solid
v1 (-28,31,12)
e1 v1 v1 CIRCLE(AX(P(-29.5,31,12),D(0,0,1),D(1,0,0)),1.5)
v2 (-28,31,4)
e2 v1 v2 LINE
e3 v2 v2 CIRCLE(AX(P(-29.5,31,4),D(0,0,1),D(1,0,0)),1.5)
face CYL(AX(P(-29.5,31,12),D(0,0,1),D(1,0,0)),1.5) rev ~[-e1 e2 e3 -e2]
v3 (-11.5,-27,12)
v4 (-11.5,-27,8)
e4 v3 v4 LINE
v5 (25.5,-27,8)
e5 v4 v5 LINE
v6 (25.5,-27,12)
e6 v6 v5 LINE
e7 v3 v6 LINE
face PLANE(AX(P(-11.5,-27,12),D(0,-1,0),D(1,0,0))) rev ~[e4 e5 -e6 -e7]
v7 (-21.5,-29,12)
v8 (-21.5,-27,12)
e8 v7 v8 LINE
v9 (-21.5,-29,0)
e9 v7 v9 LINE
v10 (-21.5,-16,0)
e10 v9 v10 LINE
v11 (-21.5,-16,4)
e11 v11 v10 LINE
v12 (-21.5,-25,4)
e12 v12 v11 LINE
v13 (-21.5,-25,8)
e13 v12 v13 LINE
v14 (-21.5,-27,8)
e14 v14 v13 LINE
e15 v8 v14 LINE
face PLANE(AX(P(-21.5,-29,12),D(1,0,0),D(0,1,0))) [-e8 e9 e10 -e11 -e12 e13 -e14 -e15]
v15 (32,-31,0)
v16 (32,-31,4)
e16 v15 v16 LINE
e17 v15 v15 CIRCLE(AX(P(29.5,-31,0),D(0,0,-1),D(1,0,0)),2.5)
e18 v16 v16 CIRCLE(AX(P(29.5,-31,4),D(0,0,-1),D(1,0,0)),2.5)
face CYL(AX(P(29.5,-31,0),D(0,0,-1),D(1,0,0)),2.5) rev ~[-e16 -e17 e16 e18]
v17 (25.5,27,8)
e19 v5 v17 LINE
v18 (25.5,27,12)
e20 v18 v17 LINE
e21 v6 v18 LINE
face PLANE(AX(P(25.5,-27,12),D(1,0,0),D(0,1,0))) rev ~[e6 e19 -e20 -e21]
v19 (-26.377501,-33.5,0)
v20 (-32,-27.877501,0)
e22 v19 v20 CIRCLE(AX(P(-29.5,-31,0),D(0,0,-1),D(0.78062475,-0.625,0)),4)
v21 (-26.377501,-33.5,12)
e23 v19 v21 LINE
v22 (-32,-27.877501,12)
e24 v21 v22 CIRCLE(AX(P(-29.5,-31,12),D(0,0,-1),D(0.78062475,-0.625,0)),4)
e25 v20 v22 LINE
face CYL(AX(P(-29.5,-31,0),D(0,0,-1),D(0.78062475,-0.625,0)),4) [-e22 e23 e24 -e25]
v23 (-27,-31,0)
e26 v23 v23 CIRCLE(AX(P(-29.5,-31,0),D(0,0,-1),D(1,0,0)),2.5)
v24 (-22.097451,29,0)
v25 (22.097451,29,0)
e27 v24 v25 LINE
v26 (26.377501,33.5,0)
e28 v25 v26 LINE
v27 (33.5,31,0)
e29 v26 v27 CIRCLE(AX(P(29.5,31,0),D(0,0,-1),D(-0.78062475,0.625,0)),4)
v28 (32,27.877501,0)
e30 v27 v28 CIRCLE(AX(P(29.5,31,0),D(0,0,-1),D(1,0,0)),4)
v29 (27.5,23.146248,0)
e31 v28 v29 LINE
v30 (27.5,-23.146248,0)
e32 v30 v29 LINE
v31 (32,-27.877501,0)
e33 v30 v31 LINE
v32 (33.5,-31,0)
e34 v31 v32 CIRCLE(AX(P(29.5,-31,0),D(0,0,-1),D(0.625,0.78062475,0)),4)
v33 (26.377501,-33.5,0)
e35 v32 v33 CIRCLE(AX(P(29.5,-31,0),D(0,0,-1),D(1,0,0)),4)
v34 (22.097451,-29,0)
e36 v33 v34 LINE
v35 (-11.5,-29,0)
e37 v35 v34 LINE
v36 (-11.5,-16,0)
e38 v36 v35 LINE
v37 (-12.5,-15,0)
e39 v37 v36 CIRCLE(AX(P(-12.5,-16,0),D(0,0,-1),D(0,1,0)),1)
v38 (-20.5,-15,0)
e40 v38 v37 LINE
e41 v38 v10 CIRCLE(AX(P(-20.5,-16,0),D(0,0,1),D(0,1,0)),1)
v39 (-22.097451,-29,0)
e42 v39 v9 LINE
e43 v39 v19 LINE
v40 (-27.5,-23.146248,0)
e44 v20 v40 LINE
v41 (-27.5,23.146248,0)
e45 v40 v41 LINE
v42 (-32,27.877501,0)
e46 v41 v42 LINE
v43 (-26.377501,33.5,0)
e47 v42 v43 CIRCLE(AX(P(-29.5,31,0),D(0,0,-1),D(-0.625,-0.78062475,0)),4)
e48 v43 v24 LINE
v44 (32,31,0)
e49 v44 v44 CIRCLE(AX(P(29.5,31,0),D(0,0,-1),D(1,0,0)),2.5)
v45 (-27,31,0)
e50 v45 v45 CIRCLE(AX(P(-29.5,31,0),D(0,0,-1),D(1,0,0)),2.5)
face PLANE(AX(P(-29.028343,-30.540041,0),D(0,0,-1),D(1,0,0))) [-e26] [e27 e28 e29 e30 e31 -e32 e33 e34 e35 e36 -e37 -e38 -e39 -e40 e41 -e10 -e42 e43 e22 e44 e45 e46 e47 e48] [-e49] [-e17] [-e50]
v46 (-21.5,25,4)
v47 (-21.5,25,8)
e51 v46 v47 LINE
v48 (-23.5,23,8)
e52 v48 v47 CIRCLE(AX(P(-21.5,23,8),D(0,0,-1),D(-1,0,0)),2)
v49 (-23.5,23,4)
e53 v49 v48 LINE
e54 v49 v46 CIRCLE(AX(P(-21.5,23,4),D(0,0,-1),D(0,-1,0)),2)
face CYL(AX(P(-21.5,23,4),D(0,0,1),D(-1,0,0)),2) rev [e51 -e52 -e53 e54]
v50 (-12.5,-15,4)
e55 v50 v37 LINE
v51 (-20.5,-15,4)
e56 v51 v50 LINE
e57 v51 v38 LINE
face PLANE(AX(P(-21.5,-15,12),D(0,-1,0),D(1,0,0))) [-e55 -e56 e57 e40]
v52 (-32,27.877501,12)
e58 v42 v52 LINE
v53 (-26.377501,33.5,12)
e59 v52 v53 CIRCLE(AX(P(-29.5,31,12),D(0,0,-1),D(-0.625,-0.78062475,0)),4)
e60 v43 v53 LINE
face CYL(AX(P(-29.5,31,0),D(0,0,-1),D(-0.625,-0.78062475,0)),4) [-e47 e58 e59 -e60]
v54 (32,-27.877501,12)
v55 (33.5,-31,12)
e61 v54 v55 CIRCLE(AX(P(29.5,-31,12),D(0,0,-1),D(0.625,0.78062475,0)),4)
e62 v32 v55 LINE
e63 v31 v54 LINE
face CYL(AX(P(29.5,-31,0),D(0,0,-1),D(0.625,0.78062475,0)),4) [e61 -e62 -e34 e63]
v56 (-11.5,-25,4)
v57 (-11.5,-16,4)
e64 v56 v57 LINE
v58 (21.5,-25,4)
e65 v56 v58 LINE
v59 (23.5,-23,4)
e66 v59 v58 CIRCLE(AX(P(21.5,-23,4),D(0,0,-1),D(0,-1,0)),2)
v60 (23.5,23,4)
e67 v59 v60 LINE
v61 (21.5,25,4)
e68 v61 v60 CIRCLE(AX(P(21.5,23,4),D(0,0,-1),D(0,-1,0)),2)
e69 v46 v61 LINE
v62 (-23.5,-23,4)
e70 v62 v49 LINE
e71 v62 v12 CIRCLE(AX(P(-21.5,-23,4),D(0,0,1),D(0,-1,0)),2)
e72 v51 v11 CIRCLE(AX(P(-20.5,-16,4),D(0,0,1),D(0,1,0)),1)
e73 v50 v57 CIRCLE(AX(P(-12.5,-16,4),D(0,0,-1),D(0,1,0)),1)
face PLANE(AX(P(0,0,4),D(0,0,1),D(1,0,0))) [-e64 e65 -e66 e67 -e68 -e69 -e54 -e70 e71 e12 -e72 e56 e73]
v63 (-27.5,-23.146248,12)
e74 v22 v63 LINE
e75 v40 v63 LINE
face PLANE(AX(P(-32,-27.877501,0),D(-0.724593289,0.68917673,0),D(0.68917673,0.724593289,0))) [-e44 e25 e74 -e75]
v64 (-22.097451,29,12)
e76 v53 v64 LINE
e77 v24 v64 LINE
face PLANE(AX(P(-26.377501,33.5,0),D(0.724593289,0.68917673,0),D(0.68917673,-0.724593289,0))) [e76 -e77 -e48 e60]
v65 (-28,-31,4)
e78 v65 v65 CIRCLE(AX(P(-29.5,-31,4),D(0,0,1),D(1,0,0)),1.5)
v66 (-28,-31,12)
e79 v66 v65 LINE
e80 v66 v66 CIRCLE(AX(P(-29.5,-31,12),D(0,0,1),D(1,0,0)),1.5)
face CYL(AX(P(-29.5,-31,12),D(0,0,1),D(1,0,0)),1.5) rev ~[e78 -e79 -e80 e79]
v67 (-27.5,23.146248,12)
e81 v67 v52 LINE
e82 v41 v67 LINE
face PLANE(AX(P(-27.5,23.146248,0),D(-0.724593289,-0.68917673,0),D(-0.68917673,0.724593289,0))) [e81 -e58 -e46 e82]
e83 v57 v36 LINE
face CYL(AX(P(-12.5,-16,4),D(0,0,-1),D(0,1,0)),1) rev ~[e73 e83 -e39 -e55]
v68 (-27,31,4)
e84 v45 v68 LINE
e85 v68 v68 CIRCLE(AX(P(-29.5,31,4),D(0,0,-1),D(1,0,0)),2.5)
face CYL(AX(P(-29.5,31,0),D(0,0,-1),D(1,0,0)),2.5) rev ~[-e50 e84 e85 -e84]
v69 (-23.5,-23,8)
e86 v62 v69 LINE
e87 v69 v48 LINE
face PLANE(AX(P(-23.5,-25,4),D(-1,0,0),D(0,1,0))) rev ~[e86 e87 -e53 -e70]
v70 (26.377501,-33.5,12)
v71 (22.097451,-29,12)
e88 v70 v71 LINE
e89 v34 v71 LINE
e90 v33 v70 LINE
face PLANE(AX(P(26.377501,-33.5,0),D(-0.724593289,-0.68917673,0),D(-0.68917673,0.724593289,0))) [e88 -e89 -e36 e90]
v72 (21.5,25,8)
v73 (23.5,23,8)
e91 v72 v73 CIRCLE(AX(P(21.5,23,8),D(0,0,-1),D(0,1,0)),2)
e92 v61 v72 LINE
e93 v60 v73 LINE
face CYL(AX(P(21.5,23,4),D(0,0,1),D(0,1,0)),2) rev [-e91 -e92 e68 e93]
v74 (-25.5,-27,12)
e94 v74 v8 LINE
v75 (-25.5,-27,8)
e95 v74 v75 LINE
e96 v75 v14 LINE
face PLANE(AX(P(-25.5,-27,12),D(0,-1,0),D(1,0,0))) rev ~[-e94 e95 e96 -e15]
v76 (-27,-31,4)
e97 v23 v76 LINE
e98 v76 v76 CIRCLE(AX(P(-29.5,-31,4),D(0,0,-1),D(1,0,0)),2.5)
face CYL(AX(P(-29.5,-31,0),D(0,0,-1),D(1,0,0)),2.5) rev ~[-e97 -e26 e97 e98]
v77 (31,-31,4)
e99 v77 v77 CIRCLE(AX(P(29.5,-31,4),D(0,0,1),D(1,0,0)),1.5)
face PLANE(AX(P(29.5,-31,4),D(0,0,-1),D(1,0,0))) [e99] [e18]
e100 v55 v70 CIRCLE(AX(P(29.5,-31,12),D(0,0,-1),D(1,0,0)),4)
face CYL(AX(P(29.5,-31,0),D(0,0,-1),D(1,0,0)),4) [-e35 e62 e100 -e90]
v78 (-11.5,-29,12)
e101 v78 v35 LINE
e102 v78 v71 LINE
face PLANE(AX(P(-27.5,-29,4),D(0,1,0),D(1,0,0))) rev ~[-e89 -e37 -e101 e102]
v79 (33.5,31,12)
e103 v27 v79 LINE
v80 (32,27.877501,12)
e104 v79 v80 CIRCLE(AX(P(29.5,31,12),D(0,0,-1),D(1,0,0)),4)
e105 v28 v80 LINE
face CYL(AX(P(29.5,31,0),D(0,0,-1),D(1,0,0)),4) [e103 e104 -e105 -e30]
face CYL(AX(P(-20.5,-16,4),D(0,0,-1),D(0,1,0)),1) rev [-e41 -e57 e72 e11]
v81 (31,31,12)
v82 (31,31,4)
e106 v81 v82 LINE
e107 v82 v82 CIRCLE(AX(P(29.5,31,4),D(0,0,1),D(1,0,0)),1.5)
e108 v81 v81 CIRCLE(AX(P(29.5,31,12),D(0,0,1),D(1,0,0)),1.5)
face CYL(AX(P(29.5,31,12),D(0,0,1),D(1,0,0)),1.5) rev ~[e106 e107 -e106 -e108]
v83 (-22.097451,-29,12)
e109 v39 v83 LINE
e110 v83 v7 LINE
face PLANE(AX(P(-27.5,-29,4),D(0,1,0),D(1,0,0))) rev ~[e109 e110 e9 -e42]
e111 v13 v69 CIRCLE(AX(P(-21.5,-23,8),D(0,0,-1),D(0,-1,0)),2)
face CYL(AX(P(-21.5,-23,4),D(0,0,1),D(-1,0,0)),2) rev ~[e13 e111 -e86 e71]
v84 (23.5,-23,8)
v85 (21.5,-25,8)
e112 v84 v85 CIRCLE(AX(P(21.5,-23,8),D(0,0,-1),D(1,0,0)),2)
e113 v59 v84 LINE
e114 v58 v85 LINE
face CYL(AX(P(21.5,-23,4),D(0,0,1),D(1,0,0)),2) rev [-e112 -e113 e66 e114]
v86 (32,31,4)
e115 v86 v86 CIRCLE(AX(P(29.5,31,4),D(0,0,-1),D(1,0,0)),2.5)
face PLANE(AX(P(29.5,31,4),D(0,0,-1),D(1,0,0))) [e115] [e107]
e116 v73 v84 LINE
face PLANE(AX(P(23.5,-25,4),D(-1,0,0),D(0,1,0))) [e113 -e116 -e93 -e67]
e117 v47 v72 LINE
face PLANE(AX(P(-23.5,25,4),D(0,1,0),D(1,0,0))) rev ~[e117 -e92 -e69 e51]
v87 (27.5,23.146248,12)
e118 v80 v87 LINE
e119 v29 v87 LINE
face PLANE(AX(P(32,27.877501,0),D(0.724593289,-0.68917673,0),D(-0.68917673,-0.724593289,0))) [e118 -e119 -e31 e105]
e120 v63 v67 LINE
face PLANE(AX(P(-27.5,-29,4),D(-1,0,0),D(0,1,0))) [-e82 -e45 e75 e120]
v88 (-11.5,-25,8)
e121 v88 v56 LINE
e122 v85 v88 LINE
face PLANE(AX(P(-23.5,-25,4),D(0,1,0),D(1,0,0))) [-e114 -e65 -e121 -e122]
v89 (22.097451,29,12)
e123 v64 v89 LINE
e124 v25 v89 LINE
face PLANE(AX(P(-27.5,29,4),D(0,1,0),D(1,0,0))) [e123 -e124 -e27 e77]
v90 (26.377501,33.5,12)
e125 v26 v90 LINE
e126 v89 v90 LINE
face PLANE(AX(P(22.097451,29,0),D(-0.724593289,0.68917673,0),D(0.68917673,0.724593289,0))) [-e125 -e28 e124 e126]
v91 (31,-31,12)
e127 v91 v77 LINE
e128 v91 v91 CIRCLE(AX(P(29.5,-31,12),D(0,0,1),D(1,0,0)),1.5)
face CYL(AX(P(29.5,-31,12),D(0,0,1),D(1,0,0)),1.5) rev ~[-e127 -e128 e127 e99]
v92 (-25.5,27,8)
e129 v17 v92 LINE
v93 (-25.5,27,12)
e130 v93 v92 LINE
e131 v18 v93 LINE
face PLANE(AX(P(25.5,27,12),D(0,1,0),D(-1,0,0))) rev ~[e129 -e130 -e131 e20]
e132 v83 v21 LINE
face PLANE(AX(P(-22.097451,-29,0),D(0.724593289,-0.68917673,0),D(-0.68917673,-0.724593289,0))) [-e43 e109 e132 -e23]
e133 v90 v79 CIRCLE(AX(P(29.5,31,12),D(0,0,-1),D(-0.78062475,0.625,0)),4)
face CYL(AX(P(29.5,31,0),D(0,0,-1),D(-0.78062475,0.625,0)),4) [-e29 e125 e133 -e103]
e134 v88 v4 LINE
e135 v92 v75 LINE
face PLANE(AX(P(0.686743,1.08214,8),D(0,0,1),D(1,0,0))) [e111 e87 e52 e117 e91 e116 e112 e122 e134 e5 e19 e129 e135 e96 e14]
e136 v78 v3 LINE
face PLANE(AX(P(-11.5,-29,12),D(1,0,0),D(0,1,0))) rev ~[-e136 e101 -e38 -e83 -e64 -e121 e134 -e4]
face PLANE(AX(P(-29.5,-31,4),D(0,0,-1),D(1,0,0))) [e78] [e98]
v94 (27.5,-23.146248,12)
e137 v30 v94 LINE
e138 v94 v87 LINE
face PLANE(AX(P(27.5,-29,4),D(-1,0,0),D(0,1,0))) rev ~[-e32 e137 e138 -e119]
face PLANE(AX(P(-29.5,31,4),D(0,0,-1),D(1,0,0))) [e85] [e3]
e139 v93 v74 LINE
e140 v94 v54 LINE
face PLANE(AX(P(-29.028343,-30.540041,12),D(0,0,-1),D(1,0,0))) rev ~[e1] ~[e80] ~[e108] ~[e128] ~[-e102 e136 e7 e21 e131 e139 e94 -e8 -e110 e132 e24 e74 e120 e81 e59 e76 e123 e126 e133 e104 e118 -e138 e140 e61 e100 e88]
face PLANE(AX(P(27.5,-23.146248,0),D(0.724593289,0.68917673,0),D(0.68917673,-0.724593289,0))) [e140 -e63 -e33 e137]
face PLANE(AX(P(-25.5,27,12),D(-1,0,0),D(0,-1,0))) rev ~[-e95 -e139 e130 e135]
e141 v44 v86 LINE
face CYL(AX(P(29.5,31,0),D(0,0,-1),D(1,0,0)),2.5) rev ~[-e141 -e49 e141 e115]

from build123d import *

# Parameters (mm, degrees)
F0_W      = 55
F0_H      = 58
F1_DEPTH  = 4
F2_W      = 55
F2_H      = 58
F2_W_2    = 47
F2_H_2    = 50
F3_DEPTH  = 8
F4_R      = 2
F5_W      = 10
F5_H      = 10
F6_DEPTH  = 25.4
F7_W      = 10
F7_H      = 4
F8_DEPTH  = 17.018
F9_R      = 1
F11_DEPTH = 4
F13_DEPTH = 12
F14_R     = 2.5
F15_DEPTH = 4
F16_R     = 1.5
F17_DEPTH = 25.4


# Not quite as in the source:
# - a feature names something its author has since deleted; it is built from what else it names


with BuildPart() as f1:
    # F0 (on Top) → F1 (new body)
    with BuildSketch(Plane.XY):
        Rectangle(F0_W, F0_H)
    extrude(amount=F1_DEPTH)

    # F2 (on face) → F3 (join)
    with BuildSketch(Plane.XY.offset(4)):
        Rectangle(F2_W, F2_H)
        Rectangle(F2_W_2, F2_H_2, mode=Mode.SUBTRACT)
    extrude(amount=F3_DEPTH)

    # F4
    f4_edges = [f1.edges().sort_by_distance(p)[0] for p in [
        (23.5, -25, 8),
        (-23.5, -25, 8),
        (-23.5, 25, 8),
        (23.5, 25, 8),
    ]]
    fillet(f4_edges, radius=F4_R)

    # F5 (on face) → F6 (cut)
    with BuildSketch(Plane.XY.offset(12)):
        with Locations((-16.5, -20)):
            Rectangle(F5_W, F5_H)
    extrude(amount=-F6_DEPTH, mode=Mode.SUBTRACT)

    # F7 (on face) → F8 (cut)
    with BuildSketch(Plane.XY.offset(12)):
        with Locations((-16.5, -27)):
            Rectangle(F7_W, F7_H)
    extrude(amount=-F8_DEPTH, mode=Mode.SUBTRACT)

    # F9
    f9_edges = [f1.edges().sort_by_distance(p)[0] for p in [
        (-21.5, -15, 2),
        (-11.5, -15, 2),
    ]]
    fillet(f9_edges, radius=F9_R)

    # F10 (on face) → F11 (cut)
    with BuildSketch(Plane.XY.offset(12)):
        with BuildLine():
            Line((25.5, -27), (25.5, 27))
            Line((25.5, 27), (-25.5, 27))
            Line((-25.5, 27), (-25.5, -27))
            Line((-25.5, -27), (-21.5, -27))
            Line((-21.5, -27), (-21.5, -25))
            ThreePointArc((-21.5, -25), (-22.9142135624, -24.4142135624), (-23.5, -23))
            Line((-23.5, -23), (-23.5, 23))
            ThreePointArc((-23.5, 23), (-22.9142135624, 24.4142135624), (-21.5, 25))
            Line((-21.5, 25), (21.5, 25))
            ThreePointArc((21.5, 25), (22.9142135624, 24.4142135624), (23.5, 23))
            Line((23.5, 23), (23.5, -23))
            ThreePointArc((23.5, -23), (22.9142135624, -24.4142135624), (21.5, -25))
            Line((21.5, -25), (-11.5, -25))
            Line((-11.5, -25), (-11.5, -27))
            Line((-11.5, -27), (25.5, -27))
        make_face()
    extrude(amount=-F11_DEPTH, mode=Mode.SUBTRACT)

    # F12 (on face) → F13 (join)
    with BuildSketch(Plane(origin=(0, 0, 0), x_dir=(1, 0, 0), z_dir=(0, 0, -1))):
        with BuildLine():
            ThreePointArc((-26.0358983849, 29), (-25.6362966948, 29.9647238196), (-25.5, 31))
            ThreePointArc((-25.5, 31), (-25.7257453718, 32.3247648854), (-26.3775010008, 33.5))
            Line((-26.3775010008, 33.5), (-32, 33.5))
            Line((-32, 33.5), (-32, 27.8775010008))
            ThreePointArc((-32, 27.8775010008), (-29.8027756377, 27.011475597), (-27.5, 27.5358983849))
            Line((-27.5, 27.5358983849), (-27.5, 29))
            Line((-27.5, 29), (-26.0358983849, 29))
        make_face()
        with BuildLine():
            Line((-32, 33.5), (-26.3775010008, 33.5))
            ThreePointArc((-26.3775010008, 33.5), (-32.3284271247, 33.8284271247), (-32, 27.8775010008))
            Line((-32, 27.8775010008), (-32, 33.5))
        make_face()
        with BuildLine():
            ThreePointArc((-27.5, 27.5358983849), (-29.8027756377, 27.011475597), (-32, 27.8775010008))
            Line((-32, 27.8775010008), (-27.5, 23.1462475253))
            Line((-27.5, 23.1462475253), (-27.5, 27.5358983849))
        make_face()
        with BuildLine():
            ThreePointArc((-26.3775010008, 33.5), (-25.7257453718, 32.3247648854), (-25.5, 31))
            ThreePointArc((-25.5, 31), (-25.6362966948, 29.9647238196), (-26.0358983849, 29))
            Line((-26.0358983849, 29), (-22.0974513047, 29))
            Line((-22.0974513047, 29), (-26.3775010008, 33.5))
        make_face()
        with BuildLine():
            Line((32, 33.5), (26.3775010008, 33.5))
            ThreePointArc((26.3775010008, 33.5), (25.511475597, 31.3027756377), (26.0358983849, 29))
            Line((26.0358983849, 29), (27.5, 29))
            Line((27.5, 29), (27.5, 27.5358983849))
            ThreePointArc((27.5, 27.5358983849), (29.8027756377, 27.011475597), (32, 27.8775010008))
            Line((32, 27.8775010008), (32, 33.5))
        make_face()
        with BuildLine():
            ThreePointArc((33.5, 31), (30.8247648854, 34.7742546282), (26.3775010008, 33.5))
            Line((26.3775010008, 33.5), (32, 33.5))
            Line((32, 33.5), (32, 27.8775010008))
            ThreePointArc((32, 27.8775010008), (33.1055512755, 29.2679491924), (33.5, 31))
        make_face()
        with BuildLine():
            Line((27.5, 23.1462475253), (32, 27.8775010008))
            ThreePointArc((32, 27.8775010008), (29.8027756377, 27.011475597), (27.5, 27.5358983849))
            Line((27.5, 27.5358983849), (27.5, 23.1462475253))
        make_face()
        with BuildLine():
            ThreePointArc((26.0358983849, 29), (25.511475597, 31.3027756377), (26.3775010008, 33.5))
            Line((26.3775010008, 33.5), (22.0974513047, 29))
            Line((22.0974513047, 29), (26.0358983849, 29))
        make_face()
        with BuildLine():
            ThreePointArc((-27.5, -27.5358983849), (-29.8027756377, -27.011475597), (-32, -27.8775010008))
            Line((-32, -27.8775010008), (-32, -33.5))
            Line((-32, -33.5), (-26.3775010008, -33.5))
            ThreePointArc((-26.3775010008, -33.5), (-25.7257453718, -32.3247648854), (-25.5, -31))
            ThreePointArc((-25.5, -31), (-25.6362966948, -29.9647238196), (-26.0358983849, -29))
            Line((-26.0358983849, -29), (-27.5, -29))
            Line((-27.5, -29), (-27.5, -27.5358983849))
        make_face()
        with BuildLine():
            Line((-32, -33.5), (-32, -27.8775010008))
            ThreePointArc((-32, -27.8775010008), (-32.3284271247, -33.8284271247), (-26.3775010008, -33.5))
            Line((-26.3775010008, -33.5), (-32, -33.5))
        make_face()
        with BuildLine():
            Line((-27.5, -23.1462475253), (-32, -27.8775010008))
            ThreePointArc((-32, -27.8775010008), (-29.8027756377, -27.011475597), (-27.5, -27.5358983849))
            Line((-27.5, -27.5358983849), (-27.5, -23.1462475253))
        make_face()
        with BuildLine():
            ThreePointArc((-25.5, -31), (-25.7257453718, -32.3247648854), (-26.3775010008, -33.5))
            Line((-26.3775010008, -33.5), (-22.0974513047, -29))
            Line((-22.0974513047, -29), (-26.0358983849, -29))
            ThreePointArc((-26.0358983849, -29), (-25.6362966948, -29.9647238196), (-25.5, -31))
        make_face()
        with BuildLine():
            ThreePointArc((26.0358983849, -29), (25.511475597, -31.3027756377), (26.3775010008, -33.5))
            Line((26.3775010008, -33.5), (32, -33.5))
            Line((32, -33.5), (32, -27.8775010008))
            ThreePointArc((32, -27.8775010008), (29.8027756377, -27.011475597), (27.5, -27.5358983849))
            Line((27.5, -27.5358983849), (27.5, -29))
            Line((27.5, -29), (26.0358983849, -29))
        make_face()
        with BuildLine():
            Line((22.0974513047, -29), (26.3775010008, -33.5))
            ThreePointArc((26.3775010008, -33.5), (25.511475597, -31.3027756377), (26.0358983849, -29))
            Line((26.0358983849, -29), (22.0974513047, -29))
        make_face()
        with BuildLine():
            ThreePointArc((27.5, -27.5358983849), (29.8027756377, -27.011475597), (32, -27.8775010008))
            Line((32, -27.8775010008), (27.5, -23.1462475253))
            Line((27.5, -23.1462475253), (27.5, -27.5358983849))
        make_face()
        with BuildLine():
            Line((32, -33.5), (26.3775010008, -33.5))
            ThreePointArc((26.3775010008, -33.5), (30.8247648854, -34.7742546282), (33.5, -31))
            ThreePointArc((33.5, -31), (33.1055512755, -29.2679491924), (32, -27.8775010008))
            Line((32, -27.8775010008), (32, -33.5))
        make_face()
    extrude(amount=-F13_DEPTH)

    # F14 (on face) → F15 (cut)
    with BuildSketch(Plane(origin=(0, 0, 0), x_dir=(1, 0, 0), z_dir=(0, 0, -1))):
        with Locations((-29.5, -31)):
            Circle(F14_R)
        with Locations((29.5, -31)):
            Circle(F14_R)
        with Locations((-29.5, 31)):
            Circle(F14_R)
        with Locations((29.5, 31)):
            Circle(F14_R)
    extrude(amount=-F15_DEPTH, mode=Mode.SUBTRACT)

    # F16 (on face) → F17 (cut)
    with BuildSketch(Plane.XY.offset(12)):
        with Locations((29.5, -31)):
            Circle(F16_R)
        with Locations((-29.5, -31)):
            Circle(F16_R)
        with Locations((29.5, 31)):
            Circle(F16_R)
        with Locations((-29.5, 31)):
            Circle(F16_R)
    extrude(amount=-F17_DEPTH, mode=Mode.SUBTRACT)


solid = f1.part
